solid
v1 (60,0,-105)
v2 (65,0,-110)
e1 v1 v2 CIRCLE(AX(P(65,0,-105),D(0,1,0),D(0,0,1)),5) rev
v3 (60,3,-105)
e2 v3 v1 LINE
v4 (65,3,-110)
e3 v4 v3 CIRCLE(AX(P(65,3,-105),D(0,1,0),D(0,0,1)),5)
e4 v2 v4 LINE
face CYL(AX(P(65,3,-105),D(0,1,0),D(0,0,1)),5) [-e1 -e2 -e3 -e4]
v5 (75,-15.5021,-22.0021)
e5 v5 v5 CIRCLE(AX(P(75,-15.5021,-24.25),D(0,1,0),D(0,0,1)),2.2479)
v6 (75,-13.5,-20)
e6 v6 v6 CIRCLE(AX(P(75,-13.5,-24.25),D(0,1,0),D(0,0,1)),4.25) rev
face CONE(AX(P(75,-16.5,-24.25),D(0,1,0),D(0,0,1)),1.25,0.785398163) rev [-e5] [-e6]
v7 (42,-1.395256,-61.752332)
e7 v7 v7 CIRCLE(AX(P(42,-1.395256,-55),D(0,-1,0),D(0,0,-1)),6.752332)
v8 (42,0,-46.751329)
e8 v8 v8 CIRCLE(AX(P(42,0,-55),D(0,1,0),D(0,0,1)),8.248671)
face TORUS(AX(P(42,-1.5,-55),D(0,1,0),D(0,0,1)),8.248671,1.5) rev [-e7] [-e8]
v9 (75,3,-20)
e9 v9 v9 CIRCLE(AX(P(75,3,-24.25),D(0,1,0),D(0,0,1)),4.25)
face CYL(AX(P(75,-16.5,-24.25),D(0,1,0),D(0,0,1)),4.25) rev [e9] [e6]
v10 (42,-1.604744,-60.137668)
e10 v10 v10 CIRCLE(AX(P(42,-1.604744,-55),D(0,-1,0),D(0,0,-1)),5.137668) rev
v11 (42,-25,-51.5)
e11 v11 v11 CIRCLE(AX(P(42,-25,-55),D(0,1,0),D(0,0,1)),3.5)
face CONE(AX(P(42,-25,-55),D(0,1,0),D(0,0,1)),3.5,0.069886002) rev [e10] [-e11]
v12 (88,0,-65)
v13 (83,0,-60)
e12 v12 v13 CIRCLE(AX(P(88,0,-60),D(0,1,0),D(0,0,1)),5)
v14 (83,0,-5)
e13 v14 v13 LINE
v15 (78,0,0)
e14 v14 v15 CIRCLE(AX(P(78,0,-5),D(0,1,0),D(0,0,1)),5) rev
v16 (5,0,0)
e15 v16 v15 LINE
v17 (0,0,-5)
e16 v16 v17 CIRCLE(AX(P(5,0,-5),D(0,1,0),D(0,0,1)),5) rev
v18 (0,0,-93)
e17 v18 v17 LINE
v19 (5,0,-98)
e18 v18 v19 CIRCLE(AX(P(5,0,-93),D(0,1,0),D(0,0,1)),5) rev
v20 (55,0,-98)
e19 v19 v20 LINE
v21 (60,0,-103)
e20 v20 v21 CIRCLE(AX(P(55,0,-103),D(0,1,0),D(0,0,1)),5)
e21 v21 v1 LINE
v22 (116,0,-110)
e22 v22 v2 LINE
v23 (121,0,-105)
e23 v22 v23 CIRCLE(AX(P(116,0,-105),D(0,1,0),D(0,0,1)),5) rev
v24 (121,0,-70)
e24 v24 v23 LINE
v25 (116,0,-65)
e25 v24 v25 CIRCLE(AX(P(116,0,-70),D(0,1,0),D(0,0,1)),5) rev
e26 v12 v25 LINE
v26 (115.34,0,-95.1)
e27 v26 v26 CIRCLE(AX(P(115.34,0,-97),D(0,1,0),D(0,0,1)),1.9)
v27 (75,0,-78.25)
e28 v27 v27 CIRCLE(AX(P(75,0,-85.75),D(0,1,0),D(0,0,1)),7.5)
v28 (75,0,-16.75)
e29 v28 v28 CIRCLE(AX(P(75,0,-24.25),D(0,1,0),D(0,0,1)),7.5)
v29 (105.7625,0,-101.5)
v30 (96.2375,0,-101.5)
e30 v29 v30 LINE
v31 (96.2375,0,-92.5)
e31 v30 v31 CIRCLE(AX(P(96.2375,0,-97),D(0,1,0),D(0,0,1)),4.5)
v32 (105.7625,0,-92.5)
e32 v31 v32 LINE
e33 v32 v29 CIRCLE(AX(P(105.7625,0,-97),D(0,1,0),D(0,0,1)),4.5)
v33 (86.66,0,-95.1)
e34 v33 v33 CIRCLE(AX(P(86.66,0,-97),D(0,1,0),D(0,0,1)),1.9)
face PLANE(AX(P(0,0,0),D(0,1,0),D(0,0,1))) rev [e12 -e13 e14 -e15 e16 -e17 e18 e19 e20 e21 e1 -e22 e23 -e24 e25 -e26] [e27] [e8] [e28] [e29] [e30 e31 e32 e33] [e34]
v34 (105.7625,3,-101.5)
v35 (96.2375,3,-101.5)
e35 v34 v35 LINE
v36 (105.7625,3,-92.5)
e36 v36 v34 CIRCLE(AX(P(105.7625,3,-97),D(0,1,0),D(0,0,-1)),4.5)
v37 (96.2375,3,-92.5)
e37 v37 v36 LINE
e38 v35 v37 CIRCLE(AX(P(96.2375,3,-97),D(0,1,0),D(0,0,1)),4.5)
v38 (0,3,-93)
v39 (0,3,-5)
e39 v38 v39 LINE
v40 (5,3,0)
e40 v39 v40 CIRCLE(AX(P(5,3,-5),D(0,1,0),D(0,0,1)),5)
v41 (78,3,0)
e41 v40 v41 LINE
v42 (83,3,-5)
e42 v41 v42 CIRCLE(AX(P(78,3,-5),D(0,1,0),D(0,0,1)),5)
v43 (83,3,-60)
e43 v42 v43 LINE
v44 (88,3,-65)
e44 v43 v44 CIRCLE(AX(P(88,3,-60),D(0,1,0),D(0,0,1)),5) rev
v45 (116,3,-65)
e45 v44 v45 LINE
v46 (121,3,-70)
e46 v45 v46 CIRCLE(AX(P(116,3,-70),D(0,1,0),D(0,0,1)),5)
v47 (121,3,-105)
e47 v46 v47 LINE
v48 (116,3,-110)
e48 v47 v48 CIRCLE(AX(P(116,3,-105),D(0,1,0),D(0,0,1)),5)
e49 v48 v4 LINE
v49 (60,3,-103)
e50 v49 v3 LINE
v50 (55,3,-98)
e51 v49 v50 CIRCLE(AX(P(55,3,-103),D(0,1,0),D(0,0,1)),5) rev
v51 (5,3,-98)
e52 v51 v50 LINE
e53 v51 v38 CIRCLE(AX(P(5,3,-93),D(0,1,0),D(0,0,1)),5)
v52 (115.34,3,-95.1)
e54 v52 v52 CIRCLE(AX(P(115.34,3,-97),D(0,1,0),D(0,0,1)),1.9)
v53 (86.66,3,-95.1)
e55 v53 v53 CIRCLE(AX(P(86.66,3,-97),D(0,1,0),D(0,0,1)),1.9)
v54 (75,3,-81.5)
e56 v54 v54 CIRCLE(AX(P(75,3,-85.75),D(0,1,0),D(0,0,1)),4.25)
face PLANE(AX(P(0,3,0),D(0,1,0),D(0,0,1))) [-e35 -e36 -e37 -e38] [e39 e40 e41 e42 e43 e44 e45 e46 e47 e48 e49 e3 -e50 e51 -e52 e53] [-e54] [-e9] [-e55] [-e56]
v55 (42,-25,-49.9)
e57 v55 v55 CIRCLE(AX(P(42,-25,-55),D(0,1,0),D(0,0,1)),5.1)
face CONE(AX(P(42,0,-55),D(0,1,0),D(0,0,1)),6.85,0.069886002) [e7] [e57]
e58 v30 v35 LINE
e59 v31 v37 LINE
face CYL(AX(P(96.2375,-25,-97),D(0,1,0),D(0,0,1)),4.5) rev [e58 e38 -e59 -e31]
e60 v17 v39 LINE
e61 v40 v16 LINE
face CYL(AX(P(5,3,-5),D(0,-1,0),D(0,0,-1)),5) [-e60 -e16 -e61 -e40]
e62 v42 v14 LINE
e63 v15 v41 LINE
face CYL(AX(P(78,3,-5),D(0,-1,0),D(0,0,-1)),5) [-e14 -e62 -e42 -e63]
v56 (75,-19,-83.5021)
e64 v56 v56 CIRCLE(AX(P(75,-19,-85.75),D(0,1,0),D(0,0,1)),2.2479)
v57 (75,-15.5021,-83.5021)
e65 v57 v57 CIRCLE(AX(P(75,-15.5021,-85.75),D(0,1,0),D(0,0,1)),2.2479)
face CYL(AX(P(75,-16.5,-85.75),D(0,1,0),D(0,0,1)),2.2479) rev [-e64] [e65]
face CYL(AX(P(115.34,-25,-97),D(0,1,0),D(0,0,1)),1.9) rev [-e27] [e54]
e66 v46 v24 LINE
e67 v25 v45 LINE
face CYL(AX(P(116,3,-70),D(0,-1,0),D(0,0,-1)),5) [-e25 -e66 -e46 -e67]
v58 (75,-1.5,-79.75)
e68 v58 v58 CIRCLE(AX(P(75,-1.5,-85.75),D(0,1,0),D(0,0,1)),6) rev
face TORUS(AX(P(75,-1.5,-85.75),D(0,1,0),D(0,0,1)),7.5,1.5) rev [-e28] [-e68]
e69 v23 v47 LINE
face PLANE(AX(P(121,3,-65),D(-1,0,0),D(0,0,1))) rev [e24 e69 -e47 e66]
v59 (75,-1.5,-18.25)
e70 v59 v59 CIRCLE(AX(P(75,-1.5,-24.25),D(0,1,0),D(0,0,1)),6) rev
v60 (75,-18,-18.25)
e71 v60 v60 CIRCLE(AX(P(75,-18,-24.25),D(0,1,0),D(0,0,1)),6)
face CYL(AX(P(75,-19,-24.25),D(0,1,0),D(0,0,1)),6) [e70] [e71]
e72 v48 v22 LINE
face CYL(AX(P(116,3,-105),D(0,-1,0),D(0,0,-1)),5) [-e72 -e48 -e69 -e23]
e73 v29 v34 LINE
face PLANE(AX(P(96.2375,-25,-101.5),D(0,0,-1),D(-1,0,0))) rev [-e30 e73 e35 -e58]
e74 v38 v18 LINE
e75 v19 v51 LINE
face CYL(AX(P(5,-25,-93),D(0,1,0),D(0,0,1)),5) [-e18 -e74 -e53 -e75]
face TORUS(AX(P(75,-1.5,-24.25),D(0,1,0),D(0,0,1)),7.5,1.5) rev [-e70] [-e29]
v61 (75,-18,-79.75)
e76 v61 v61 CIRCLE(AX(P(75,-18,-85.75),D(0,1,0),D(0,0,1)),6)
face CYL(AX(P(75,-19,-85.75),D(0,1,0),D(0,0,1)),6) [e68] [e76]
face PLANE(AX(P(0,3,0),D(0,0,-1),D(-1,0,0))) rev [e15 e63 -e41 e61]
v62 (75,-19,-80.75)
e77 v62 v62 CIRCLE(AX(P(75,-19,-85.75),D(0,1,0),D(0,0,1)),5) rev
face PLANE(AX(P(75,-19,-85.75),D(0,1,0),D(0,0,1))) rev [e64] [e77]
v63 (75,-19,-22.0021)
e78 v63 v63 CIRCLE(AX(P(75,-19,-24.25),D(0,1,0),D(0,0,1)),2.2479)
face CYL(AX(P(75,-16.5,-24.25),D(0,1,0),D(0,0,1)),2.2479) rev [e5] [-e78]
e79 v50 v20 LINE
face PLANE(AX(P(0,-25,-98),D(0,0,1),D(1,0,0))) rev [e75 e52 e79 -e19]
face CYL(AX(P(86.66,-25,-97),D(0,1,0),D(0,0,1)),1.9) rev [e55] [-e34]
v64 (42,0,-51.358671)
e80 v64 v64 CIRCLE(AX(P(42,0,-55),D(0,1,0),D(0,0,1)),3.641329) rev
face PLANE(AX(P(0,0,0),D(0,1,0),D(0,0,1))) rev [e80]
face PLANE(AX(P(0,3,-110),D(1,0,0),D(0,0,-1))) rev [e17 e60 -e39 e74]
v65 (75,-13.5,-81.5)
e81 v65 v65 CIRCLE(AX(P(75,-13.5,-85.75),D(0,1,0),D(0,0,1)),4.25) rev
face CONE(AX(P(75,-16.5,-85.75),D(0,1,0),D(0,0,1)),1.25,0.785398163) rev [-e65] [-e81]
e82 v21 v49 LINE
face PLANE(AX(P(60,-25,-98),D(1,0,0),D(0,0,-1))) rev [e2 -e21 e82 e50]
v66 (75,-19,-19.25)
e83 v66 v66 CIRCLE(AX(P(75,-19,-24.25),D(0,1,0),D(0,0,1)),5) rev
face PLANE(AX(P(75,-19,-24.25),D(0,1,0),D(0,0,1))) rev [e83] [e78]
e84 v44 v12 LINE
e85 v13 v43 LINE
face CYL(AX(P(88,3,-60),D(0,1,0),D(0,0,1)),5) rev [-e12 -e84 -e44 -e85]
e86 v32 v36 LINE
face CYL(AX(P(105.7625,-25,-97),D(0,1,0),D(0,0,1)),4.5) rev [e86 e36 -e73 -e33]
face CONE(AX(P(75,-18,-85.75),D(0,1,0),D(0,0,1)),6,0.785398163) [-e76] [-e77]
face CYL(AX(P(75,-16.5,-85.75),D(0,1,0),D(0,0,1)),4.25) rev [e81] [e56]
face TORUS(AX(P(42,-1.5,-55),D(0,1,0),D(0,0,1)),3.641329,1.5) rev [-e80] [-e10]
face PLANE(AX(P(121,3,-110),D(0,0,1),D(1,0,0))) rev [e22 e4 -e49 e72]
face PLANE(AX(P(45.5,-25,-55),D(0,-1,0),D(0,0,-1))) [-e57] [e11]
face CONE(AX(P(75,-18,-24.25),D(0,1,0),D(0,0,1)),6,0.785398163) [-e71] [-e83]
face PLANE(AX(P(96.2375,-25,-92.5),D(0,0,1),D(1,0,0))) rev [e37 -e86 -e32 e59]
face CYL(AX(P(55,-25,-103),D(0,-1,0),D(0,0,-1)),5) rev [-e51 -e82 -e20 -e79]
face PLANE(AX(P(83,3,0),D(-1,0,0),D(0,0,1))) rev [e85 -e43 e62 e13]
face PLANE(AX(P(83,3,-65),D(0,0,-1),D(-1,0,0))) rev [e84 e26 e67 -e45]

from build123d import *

# Parameters (mm, degrees)
PLATE_DEPTH           = 3
SKETCH2_R             = 6
MOUNT_POSTS_DEPTH     = 22
SKETCH3_R             = 4.25
MOUNT_CBORE_DEPTH     = 19.5
F_8_CLEARANCE_HOLE1_D = 4.4958
FILLET1_R             = 1.5
SKETCH7_R             = 1.9
TERMINAL_STRIP_DEPTH  = 166.90660023
SKETCH9_W             = 60
SKETCH9_H             = 12
WIRING_RELIEF_DEPTH   = 166.90660023
CHAMFER1_SIZE         = 3
CHAMFER2_SIZE         = 1
FILLET2_R             = 5
FILLET3_R             = 1.5


with BuildPart() as part:
    # Sketch1 → plate (new body)
    with BuildSketch(Plane(origin=(0, 0, 0), x_dir=(1, 0, 0), z_dir=(0, 1, 0))):
        Polygon((0, 0), (83, 0), (83, 65), (121, 65), (121, 110), (0, 110), align=None)
    extrude(amount=PLATE_DEPTH)

    # Sketch2 → mount posts (add)
    with BuildSketch(Plane(origin=(0, 3, 0), x_dir=(1, 0, 0), z_dir=(0, 1, 0))):
        with Locations(Location((75, 85.75, 0), (0, 0, 270))):
            Circle(SKETCH2_R)
        with Locations(Location((75, 24.25, 0), (0, 0, 270))):
            Circle(SKETCH2_R)
    extrude(amount=-MOUNT_POSTS_DEPTH)

    # Sketch3 → mount cbore (cut)
    with BuildSketch(Plane(origin=(0, 3, 0), x_dir=(1, 0, 0), z_dir=(0, 1, 0))):
        with Locations(Location((75, 85.75, 0), (0, 0, 270))):
            Circle(SKETCH3_R)
        with Locations(Location((75, 24.25, 0), (0, 0, 270))):
            Circle(SKETCH3_R)
    extrude(amount=-MOUNT_CBORE_DEPTH, mode=Mode.SUBTRACT)

    # #8 Clearance Hole1 (through all)
    with Locations(Plane(origin=(0, -16.5, 0), x_dir=(1, 0, 0), z_dir=(0, 1, 0))):
        with Locations((75, 85.75), (75, 24.25)):
            Hole(F_8_CLEARANCE_HOLE1_D / 2)

    # Sketch8 → foot (revolve)
    with BuildSketch(Plane(origin=(0, 0, -55), x_dir=(1, 0, 0), z_dir=(0, 0, -1)), mode=Mode.PRIVATE) as foot_sk:
        Polygon((47.25, 0), (48.85, 0), (47.1, 25), (45.5, 25), align=None)
    revolve(foot_sk.sketch.rotate(Axis((42, 0, -55), (0, -1, 0)), 90), axis=Axis((42, 0, -55), (0, -1, 0)))

    # Fillet1
    fillet1_edges = [part.edges().sort_by_distance(p)[0] for p in [
        (42, 0, -60.25),
        (42, 0, -61.85),
    ]]
    fillet(fillet1_edges, radius=FILLET1_R)

    # Sketch7 → terminal strip (cut, through all)
    with BuildSketch(Plane(origin=(0, 3, 0), x_dir=(1, 0, 0), z_dir=(0, 1, 0))):
        with Locations(Location((115.34, 97, 0), (0, 0, 270))):
            Circle(SKETCH7_R)
        with Locations(Location((86.66, 97, 0), (0, 0, 270))):
            Circle(SKETCH7_R)
        with BuildLine():
            Line((96.2375, 101.5), (105.7625, 101.5))
            ThreePointArc((105.7625, 101.5), (110.2625, 97), (105.7625, 92.5))
            Line((105.7625, 92.5), (96.2375, 92.5))
            ThreePointArc((96.2375, 92.5), (91.7375, 97), (96.2375, 101.5))
        make_face()
    extrude(amount=-TERMINAL_STRIP_DEPTH, mode=Mode.SUBTRACT)

    # Sketch9 → wiring relief (cut, through all)
    with BuildSketch(Plane(origin=(0, 3, 0), x_dir=(1, 0, 0), z_dir=(0, 1, 0))):
        with Locations((30, 104)):
            Rectangle(SKETCH9_W, SKETCH9_H)
    extrude(amount=-WIRING_RELIEF_DEPTH, mode=Mode.SUBTRACT)

    # Chamfer1
    # the kernel refuses this chamfer: 3 mm, written as the material it adds along each edge
    with BuildSketch(Plane(origin=(75, -16.5, -85.75), x_dir=(0, 0, 1), z_dir=(-1, 0, 0))) as chamfer1_piece_1_section:
        Polygon((4.25, CHAMFER1_SIZE), (4.25 - CHAMFER1_SIZE, 0), (4.25, 0), align=None)
    chamfer1_piece_1 = revolve(axis=Axis((75, -16.5, -85.75), (0, 1, 0)), mode=Mode.PRIVATE)
    chamfer1_piece_1 = chamfer1_piece_1 - Plane(origin=(75, -14.490807126, -85.75), x_dir=(-1, 0, 0), z_dir=(0, -1, 0)) * Cylinder(2.2479, 17, mode=Mode.PRIVATE)
    add(chamfer1_piece_1)
    with BuildSketch(Plane(origin=(75, -16.5, -24.25), x_dir=(0, 0, 1), z_dir=(-1, 0, 0))) as chamfer1_piece_2_section:
        Polygon((4.25, CHAMFER1_SIZE), (4.25 - CHAMFER1_SIZE, 0), (4.25, 0), align=None)
    chamfer1_piece_2 = revolve(axis=Axis((75, -16.5, -24.25), (0, 1, 0)), mode=Mode.PRIVATE)
    chamfer1_piece_2 = chamfer1_piece_2 - Plane(origin=(75, -14.490807126, -24.25), x_dir=(-1, 0, 0), z_dir=(0, -1, 0)) * Cylinder(2.2479, 18, mode=Mode.PRIVATE)
    add(chamfer1_piece_2)

    # Chamfer2
    chamfer2_edges = [part.edges().sort_by_distance(p)[0] for p in [
        (75, -19, -91.75),
        (75, -19, -30.25),
    ]]
    chamfer(chamfer2_edges, length=CHAMFER2_SIZE)

    # Fillet2
    fillet2_edges = [part.edges().sort_by_distance(p)[0] for p in [
        (121, 1.5, -110),
        (121, 1.5, -65),
        (83, 1.5, -65),
        (83, 1.5, 0),
        (0, 1.5, 0),
        (0, 1.5, -98),
        (60, 1.5, -110),
        (60, 1.5, -98),
    ]]
    fillet(fillet2_edges, radius=FILLET2_R)

    # Fillet3
    fillet3_edges = [part.edges().sort_by_distance(p)[0] for p in [
        (75, 0, -91.75),
        (75, 0, -30.25),
    ]]
    fillet(fillet3_edges, radius=FILLET3_R)


solid = part.part
